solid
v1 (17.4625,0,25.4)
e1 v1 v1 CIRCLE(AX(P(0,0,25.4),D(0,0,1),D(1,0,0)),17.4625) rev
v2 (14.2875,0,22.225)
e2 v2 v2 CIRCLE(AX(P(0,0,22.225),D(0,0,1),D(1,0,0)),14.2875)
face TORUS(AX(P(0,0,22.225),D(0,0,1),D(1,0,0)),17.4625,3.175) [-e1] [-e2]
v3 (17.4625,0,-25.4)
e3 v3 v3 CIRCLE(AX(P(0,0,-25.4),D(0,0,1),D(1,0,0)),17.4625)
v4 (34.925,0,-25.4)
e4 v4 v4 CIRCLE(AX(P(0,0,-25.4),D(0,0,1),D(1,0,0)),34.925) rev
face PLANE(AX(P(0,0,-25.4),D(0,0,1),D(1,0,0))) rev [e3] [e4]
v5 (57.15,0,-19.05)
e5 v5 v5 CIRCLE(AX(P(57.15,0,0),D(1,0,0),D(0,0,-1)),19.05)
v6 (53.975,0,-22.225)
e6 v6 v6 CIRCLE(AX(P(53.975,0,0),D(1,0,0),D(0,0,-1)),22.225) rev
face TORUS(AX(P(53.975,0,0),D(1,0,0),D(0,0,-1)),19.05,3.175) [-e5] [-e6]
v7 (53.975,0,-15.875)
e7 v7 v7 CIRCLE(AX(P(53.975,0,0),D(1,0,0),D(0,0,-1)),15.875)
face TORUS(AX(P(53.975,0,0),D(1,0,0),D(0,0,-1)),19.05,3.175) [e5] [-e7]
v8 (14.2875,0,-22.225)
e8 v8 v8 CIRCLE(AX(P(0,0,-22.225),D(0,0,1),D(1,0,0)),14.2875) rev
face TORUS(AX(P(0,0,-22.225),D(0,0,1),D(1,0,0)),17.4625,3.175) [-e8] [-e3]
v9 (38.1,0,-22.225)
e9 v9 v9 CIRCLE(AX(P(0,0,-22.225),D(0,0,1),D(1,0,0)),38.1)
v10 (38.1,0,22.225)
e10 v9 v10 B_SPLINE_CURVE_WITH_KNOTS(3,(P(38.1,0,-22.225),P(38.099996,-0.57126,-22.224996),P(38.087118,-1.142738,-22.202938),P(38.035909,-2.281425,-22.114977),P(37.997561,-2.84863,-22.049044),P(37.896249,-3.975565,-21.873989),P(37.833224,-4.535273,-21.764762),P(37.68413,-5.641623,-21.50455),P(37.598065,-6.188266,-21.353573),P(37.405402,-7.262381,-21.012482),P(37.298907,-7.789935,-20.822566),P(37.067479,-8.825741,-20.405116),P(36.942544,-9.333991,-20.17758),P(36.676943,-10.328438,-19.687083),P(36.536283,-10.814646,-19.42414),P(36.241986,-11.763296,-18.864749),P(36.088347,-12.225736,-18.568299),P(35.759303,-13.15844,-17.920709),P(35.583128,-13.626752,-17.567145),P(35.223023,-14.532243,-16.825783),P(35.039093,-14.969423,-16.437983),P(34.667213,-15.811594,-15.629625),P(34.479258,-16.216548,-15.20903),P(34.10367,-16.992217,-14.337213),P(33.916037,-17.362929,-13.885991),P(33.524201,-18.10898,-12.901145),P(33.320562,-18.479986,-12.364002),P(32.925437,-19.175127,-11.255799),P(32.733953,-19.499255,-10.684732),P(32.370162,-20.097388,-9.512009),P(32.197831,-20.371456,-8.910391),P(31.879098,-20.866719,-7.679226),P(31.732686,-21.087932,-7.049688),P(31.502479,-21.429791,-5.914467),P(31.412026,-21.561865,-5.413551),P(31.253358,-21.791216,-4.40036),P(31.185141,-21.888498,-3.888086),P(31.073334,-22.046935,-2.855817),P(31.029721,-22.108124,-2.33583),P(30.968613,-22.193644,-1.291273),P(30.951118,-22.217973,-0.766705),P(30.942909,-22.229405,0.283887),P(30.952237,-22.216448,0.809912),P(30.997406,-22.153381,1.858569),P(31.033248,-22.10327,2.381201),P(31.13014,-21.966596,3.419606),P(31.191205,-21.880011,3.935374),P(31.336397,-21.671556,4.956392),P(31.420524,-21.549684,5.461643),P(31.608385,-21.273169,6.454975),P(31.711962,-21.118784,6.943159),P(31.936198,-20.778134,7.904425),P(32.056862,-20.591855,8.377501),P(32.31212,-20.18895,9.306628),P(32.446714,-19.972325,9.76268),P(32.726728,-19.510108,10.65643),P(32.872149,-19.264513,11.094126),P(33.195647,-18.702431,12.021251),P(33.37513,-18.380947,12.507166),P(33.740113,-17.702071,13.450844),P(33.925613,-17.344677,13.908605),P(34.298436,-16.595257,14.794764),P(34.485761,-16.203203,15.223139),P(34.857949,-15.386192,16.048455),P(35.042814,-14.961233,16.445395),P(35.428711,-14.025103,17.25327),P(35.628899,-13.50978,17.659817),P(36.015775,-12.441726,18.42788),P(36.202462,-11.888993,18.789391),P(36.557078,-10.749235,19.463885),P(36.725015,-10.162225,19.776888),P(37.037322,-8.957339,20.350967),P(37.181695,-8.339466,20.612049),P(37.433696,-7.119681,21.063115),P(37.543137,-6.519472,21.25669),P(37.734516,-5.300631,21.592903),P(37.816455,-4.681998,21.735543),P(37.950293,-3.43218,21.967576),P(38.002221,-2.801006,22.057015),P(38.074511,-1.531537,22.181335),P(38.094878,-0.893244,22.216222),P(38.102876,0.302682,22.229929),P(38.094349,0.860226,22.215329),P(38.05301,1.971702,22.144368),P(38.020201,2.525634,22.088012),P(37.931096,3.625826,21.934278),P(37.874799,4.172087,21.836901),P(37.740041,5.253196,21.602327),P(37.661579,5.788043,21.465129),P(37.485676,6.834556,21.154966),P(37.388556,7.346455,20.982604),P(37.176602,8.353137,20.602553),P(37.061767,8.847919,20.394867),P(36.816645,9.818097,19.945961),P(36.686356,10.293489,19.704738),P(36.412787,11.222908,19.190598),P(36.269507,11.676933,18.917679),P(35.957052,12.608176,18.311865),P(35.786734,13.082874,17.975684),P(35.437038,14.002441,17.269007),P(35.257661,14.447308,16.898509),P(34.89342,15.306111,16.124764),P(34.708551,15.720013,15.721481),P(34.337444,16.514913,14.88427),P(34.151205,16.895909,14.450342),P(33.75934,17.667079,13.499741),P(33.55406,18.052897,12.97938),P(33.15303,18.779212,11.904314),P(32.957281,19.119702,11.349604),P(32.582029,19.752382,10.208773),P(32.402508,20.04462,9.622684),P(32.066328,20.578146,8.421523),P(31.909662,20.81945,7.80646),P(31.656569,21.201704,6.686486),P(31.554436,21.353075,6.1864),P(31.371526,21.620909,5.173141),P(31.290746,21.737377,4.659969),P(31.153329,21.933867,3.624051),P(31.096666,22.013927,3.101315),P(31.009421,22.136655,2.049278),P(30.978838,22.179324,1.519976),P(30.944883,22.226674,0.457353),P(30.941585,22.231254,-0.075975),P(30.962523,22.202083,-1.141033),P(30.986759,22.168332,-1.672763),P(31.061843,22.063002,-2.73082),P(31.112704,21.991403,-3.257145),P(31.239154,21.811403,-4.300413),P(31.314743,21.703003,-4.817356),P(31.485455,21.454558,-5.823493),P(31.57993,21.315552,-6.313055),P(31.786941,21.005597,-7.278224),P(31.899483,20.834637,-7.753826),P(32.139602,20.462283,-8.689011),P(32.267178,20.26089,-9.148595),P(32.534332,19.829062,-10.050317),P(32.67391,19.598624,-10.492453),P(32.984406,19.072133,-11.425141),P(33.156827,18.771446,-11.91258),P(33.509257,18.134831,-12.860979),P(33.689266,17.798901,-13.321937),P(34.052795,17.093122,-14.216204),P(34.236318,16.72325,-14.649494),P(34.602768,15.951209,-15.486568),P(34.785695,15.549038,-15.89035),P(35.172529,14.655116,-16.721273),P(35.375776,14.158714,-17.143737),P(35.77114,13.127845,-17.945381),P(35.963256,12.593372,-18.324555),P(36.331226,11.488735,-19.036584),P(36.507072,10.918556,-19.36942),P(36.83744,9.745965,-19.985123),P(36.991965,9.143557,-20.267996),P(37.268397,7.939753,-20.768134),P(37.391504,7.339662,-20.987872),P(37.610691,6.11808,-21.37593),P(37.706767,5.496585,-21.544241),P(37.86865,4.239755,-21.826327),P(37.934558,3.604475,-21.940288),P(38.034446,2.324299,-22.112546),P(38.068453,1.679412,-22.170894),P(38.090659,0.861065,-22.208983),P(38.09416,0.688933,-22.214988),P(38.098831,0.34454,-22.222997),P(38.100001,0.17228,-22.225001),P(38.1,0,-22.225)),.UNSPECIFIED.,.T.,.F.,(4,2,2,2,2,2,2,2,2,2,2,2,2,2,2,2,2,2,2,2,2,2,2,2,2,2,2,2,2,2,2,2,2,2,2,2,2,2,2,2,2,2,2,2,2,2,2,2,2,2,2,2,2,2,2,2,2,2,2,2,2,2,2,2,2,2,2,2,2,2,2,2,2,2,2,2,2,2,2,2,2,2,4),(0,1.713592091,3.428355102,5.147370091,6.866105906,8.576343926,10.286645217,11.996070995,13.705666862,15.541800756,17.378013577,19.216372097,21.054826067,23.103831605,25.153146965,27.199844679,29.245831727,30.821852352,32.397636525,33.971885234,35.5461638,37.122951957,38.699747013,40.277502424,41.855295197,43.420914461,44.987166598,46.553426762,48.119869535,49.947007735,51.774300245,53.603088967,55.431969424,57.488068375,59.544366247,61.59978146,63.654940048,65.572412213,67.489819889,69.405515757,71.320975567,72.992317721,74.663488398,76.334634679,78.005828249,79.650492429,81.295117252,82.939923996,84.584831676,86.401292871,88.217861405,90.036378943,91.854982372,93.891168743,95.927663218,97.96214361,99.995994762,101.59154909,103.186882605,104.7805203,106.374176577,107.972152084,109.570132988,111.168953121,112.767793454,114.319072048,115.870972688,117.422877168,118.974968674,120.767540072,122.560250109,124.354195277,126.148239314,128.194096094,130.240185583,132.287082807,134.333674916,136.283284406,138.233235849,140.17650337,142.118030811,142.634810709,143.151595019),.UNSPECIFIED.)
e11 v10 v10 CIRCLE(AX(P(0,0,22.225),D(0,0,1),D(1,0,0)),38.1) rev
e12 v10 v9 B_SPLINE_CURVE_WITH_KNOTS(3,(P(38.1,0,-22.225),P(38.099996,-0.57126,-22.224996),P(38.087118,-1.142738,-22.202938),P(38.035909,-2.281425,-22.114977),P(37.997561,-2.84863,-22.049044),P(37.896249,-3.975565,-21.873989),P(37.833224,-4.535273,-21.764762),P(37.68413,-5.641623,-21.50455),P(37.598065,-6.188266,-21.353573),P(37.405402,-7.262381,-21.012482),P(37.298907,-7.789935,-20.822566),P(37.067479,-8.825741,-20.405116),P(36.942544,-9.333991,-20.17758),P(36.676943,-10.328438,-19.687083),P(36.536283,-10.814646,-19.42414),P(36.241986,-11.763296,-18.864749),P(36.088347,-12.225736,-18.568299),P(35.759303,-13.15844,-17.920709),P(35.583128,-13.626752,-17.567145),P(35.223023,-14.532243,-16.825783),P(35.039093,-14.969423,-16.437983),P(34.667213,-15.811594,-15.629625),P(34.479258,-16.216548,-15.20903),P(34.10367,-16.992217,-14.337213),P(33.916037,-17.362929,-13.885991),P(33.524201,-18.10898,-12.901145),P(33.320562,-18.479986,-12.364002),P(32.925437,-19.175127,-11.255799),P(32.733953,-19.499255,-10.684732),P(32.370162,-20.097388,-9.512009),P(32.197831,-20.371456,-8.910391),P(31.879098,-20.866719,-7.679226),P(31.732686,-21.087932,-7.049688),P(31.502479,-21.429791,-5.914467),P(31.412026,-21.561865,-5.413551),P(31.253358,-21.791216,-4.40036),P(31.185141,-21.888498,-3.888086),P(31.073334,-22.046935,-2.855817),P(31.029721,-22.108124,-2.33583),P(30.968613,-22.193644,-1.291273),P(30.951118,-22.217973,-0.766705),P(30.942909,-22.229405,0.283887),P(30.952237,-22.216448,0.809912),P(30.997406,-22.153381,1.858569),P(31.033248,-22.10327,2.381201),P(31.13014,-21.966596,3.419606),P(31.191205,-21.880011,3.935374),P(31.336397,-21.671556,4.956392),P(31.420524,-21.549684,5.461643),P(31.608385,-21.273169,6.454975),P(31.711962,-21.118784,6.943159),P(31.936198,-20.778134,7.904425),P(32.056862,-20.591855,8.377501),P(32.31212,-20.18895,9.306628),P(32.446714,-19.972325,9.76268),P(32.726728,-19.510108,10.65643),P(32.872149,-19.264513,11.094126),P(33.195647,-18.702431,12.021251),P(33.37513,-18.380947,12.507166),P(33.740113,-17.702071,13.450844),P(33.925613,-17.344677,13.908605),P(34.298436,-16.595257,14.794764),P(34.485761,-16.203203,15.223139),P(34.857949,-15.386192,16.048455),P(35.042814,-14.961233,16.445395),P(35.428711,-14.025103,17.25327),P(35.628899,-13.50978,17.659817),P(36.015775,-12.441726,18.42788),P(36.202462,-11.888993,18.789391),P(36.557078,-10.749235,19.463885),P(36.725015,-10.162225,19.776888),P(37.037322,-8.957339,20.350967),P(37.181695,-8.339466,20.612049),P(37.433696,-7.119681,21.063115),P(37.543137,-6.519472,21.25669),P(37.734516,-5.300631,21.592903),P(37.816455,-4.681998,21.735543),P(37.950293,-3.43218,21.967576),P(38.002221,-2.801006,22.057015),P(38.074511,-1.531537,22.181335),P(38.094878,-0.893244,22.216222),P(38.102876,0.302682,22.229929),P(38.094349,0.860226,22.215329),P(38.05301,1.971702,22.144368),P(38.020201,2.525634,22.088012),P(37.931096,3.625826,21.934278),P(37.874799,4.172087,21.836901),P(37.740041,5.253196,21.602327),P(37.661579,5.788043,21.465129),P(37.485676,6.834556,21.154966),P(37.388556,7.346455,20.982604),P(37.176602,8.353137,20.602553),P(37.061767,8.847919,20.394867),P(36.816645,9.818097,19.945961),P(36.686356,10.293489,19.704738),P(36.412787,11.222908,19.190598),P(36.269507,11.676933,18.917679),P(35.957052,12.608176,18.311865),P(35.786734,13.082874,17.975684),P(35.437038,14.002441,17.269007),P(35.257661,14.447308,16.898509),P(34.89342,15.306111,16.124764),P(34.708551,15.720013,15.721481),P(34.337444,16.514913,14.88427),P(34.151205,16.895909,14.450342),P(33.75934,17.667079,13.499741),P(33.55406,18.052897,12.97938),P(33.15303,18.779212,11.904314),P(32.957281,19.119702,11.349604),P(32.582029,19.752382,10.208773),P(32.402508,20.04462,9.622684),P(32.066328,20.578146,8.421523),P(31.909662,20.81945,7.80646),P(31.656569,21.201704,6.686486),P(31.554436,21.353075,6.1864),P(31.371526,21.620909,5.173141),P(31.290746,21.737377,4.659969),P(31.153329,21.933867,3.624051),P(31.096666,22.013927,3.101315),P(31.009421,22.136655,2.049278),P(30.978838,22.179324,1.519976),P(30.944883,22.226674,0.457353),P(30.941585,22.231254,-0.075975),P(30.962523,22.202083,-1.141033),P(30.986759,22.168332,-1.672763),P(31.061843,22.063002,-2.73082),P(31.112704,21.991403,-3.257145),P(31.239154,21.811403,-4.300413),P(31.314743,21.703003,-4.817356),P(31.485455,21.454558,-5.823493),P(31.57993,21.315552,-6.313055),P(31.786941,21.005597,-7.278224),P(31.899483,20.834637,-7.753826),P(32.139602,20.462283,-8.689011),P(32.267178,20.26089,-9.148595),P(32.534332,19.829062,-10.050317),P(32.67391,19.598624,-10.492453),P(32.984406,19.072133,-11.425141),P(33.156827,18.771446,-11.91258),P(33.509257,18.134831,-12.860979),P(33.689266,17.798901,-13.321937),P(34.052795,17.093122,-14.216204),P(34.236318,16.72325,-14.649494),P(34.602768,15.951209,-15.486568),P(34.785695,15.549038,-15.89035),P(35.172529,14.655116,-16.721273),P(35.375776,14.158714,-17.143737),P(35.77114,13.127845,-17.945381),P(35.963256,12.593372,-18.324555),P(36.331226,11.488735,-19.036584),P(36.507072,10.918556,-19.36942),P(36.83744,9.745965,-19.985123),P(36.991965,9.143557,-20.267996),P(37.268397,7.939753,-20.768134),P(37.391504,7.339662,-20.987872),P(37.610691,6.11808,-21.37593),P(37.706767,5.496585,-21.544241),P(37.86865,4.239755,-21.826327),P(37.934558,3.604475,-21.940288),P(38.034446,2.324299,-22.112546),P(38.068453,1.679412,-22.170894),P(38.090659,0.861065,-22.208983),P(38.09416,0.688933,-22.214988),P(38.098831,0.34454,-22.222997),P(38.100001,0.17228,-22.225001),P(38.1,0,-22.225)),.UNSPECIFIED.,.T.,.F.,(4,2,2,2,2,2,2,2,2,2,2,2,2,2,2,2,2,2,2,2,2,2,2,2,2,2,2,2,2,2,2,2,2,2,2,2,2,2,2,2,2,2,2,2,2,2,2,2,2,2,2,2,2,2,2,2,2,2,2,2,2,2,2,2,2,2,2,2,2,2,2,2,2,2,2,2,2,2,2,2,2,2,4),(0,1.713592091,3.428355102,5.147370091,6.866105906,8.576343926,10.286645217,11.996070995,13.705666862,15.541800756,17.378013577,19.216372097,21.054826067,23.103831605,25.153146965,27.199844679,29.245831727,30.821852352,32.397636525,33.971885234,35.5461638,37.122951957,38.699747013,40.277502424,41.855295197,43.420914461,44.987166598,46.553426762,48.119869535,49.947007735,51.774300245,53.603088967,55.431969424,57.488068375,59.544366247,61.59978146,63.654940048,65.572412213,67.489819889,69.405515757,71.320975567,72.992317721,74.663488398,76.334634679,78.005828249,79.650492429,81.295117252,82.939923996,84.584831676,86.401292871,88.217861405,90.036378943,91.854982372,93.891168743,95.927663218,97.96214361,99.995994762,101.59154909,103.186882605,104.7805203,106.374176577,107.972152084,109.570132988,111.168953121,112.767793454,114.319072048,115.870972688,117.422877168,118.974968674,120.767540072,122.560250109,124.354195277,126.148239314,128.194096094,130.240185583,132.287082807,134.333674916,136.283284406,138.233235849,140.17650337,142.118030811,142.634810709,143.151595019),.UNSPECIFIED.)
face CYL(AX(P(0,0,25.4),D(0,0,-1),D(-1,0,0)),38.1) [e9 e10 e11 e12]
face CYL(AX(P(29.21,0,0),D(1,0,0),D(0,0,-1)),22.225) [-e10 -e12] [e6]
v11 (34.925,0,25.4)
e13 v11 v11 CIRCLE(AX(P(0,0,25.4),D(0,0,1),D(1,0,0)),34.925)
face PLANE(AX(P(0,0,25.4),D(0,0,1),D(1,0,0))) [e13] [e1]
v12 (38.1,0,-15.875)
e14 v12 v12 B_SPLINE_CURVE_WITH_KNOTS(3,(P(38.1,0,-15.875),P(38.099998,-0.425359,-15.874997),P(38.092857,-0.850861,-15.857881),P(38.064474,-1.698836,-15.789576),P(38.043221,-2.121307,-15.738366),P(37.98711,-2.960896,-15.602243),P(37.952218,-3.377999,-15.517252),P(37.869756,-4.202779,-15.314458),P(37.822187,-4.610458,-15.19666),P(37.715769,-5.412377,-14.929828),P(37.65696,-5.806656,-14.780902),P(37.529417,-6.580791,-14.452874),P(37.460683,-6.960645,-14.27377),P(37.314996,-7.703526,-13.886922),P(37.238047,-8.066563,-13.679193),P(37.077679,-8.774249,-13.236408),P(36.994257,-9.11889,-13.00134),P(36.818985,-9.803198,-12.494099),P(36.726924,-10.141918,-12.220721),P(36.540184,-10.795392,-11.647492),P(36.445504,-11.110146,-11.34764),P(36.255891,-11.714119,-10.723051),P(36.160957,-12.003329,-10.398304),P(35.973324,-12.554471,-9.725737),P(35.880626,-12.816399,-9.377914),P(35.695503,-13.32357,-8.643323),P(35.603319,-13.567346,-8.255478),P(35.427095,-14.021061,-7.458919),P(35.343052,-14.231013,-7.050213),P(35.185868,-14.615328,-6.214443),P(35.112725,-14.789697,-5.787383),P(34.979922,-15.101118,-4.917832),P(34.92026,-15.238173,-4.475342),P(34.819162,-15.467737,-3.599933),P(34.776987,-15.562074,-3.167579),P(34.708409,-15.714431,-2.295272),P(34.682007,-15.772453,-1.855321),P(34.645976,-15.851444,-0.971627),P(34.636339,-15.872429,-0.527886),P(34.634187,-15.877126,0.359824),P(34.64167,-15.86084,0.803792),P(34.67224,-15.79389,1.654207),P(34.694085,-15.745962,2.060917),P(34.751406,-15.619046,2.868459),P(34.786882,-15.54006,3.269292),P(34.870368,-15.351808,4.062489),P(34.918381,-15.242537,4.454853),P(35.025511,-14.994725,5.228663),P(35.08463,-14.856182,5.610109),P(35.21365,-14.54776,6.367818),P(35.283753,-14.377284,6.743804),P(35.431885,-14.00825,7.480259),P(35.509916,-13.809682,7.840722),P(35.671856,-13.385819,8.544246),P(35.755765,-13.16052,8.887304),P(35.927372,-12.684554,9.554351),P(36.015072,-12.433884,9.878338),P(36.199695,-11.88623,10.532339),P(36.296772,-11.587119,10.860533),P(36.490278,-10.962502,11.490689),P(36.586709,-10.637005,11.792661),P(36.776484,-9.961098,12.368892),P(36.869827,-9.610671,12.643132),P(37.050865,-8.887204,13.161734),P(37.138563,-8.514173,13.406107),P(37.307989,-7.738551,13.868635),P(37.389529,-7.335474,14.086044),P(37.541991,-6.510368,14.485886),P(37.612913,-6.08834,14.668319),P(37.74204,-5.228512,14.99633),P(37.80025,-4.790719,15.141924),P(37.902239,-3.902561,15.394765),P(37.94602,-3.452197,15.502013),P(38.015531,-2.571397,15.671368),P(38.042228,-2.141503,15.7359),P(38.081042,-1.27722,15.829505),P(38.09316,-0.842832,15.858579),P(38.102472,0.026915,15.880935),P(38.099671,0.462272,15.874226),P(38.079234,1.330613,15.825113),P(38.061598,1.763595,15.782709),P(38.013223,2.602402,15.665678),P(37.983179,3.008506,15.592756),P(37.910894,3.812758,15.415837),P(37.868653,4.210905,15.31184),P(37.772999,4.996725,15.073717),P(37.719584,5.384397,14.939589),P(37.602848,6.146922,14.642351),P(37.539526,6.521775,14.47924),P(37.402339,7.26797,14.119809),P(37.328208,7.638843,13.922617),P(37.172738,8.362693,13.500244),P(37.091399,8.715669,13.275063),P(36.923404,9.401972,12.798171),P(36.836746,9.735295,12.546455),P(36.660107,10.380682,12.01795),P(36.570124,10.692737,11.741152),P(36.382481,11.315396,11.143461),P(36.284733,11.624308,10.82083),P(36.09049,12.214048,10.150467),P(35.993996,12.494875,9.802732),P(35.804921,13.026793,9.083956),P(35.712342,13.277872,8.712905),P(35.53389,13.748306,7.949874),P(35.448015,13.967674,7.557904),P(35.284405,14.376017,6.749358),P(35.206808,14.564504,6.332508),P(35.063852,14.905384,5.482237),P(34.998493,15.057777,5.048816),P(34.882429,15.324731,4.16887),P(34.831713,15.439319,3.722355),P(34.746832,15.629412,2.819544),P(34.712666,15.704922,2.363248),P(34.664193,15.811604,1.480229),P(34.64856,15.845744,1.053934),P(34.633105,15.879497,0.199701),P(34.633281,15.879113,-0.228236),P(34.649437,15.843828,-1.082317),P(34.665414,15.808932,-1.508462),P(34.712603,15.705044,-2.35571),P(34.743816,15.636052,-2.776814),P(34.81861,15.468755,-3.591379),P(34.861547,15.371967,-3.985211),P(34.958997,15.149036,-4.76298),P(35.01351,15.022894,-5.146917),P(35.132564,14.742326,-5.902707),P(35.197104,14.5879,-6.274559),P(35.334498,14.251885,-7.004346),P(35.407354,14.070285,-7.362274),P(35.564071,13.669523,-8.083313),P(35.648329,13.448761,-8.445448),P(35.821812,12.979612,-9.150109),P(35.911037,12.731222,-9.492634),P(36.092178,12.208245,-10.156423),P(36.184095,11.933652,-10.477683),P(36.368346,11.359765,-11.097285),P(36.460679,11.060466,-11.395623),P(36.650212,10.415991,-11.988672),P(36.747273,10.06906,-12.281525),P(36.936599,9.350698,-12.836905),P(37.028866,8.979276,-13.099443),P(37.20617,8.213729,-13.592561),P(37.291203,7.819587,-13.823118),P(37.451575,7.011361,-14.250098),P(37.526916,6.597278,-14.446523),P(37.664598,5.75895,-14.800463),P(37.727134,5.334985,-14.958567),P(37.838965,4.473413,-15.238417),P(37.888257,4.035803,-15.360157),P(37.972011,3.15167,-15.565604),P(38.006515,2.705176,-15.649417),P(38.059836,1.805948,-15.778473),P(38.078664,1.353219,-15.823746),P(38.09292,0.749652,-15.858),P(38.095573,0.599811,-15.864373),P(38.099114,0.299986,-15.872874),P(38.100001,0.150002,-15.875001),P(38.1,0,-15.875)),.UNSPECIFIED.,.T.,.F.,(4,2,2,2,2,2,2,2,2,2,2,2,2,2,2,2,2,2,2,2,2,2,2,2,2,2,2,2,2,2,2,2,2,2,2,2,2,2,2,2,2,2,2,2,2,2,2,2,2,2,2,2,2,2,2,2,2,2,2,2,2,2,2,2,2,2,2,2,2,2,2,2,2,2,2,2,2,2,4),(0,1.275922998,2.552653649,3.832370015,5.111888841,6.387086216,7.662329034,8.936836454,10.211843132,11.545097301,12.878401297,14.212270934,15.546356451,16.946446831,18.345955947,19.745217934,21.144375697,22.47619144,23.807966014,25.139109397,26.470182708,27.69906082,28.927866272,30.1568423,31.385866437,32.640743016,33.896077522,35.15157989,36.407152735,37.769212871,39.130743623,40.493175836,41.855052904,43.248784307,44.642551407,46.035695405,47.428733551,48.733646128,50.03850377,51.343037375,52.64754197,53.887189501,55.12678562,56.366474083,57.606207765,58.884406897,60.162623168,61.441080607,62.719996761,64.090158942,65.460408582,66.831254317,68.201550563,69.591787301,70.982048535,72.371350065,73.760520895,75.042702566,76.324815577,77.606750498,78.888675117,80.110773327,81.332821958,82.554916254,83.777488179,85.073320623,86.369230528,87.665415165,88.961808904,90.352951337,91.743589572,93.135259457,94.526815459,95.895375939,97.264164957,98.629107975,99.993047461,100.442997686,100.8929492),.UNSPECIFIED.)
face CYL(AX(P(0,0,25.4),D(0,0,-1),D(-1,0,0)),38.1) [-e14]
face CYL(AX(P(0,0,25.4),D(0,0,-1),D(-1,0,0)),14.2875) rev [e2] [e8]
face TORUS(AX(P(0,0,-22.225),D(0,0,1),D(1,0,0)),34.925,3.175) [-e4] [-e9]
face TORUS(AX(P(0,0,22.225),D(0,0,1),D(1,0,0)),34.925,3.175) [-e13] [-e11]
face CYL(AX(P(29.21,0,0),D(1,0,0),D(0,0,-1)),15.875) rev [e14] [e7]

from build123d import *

# Parameters (mm, degrees)
SKETCH1_R                = 38.1
SKETCH1_R_2              = 14.2875
BOSS_EXTRUDE1_DEPTH      = 25.4
BOSS_EXTRUDE2_DEPTH      = 25.4
BOSS_EXTRUDE2_DEPTH_BACK = 2.54
SKETCH2_R                = 22.225
SKETCH2_R_2              = 15.875
FILLET1_R                = 3.175


with BuildPart() as part:
    # Sketch1 → Boss-Extrude1 (new, symmetric)
    with BuildSketch(Plane.XY):
        Circle(SKETCH1_R)
        Circle(SKETCH1_R_2, mode=Mode.SUBTRACT)
    extrude(amount=BOSS_EXTRUDE1_DEPTH, both=True)

    # Sketch2 → Boss-Extrude2 (add, two sides: drawn at the far end of the back side and taken through both)
    with BuildSketch(Plane(origin=(31.75, 0, 0), x_dir=(0, 0, -1), z_dir=(1, 0, 0)).offset(-BOSS_EXTRUDE2_DEPTH_BACK)):
        Circle(SKETCH2_R)
        Circle(SKETCH2_R_2, mode=Mode.SUBTRACT)
    extrude(amount=BOSS_EXTRUDE2_DEPTH + BOSS_EXTRUDE2_DEPTH_BACK)

    # Fillet1
    fillet1_edges = [part.edges().sort_by_distance(p)[0] for p in [
        (57.15, 0, 15.875),
        (57.15, 0, 22.225),
        (-38.1, 0, -25.4),
        (-38.1, 0, 25.4),
        (-14.2875, 0, -25.4),
        (-14.2875, 0, 25.4),
    ]]
    fillet(fillet1_edges, radius=FILLET1_R - 0.0001)  # a hair under: the kernel refuses the full size


solid = part.part
